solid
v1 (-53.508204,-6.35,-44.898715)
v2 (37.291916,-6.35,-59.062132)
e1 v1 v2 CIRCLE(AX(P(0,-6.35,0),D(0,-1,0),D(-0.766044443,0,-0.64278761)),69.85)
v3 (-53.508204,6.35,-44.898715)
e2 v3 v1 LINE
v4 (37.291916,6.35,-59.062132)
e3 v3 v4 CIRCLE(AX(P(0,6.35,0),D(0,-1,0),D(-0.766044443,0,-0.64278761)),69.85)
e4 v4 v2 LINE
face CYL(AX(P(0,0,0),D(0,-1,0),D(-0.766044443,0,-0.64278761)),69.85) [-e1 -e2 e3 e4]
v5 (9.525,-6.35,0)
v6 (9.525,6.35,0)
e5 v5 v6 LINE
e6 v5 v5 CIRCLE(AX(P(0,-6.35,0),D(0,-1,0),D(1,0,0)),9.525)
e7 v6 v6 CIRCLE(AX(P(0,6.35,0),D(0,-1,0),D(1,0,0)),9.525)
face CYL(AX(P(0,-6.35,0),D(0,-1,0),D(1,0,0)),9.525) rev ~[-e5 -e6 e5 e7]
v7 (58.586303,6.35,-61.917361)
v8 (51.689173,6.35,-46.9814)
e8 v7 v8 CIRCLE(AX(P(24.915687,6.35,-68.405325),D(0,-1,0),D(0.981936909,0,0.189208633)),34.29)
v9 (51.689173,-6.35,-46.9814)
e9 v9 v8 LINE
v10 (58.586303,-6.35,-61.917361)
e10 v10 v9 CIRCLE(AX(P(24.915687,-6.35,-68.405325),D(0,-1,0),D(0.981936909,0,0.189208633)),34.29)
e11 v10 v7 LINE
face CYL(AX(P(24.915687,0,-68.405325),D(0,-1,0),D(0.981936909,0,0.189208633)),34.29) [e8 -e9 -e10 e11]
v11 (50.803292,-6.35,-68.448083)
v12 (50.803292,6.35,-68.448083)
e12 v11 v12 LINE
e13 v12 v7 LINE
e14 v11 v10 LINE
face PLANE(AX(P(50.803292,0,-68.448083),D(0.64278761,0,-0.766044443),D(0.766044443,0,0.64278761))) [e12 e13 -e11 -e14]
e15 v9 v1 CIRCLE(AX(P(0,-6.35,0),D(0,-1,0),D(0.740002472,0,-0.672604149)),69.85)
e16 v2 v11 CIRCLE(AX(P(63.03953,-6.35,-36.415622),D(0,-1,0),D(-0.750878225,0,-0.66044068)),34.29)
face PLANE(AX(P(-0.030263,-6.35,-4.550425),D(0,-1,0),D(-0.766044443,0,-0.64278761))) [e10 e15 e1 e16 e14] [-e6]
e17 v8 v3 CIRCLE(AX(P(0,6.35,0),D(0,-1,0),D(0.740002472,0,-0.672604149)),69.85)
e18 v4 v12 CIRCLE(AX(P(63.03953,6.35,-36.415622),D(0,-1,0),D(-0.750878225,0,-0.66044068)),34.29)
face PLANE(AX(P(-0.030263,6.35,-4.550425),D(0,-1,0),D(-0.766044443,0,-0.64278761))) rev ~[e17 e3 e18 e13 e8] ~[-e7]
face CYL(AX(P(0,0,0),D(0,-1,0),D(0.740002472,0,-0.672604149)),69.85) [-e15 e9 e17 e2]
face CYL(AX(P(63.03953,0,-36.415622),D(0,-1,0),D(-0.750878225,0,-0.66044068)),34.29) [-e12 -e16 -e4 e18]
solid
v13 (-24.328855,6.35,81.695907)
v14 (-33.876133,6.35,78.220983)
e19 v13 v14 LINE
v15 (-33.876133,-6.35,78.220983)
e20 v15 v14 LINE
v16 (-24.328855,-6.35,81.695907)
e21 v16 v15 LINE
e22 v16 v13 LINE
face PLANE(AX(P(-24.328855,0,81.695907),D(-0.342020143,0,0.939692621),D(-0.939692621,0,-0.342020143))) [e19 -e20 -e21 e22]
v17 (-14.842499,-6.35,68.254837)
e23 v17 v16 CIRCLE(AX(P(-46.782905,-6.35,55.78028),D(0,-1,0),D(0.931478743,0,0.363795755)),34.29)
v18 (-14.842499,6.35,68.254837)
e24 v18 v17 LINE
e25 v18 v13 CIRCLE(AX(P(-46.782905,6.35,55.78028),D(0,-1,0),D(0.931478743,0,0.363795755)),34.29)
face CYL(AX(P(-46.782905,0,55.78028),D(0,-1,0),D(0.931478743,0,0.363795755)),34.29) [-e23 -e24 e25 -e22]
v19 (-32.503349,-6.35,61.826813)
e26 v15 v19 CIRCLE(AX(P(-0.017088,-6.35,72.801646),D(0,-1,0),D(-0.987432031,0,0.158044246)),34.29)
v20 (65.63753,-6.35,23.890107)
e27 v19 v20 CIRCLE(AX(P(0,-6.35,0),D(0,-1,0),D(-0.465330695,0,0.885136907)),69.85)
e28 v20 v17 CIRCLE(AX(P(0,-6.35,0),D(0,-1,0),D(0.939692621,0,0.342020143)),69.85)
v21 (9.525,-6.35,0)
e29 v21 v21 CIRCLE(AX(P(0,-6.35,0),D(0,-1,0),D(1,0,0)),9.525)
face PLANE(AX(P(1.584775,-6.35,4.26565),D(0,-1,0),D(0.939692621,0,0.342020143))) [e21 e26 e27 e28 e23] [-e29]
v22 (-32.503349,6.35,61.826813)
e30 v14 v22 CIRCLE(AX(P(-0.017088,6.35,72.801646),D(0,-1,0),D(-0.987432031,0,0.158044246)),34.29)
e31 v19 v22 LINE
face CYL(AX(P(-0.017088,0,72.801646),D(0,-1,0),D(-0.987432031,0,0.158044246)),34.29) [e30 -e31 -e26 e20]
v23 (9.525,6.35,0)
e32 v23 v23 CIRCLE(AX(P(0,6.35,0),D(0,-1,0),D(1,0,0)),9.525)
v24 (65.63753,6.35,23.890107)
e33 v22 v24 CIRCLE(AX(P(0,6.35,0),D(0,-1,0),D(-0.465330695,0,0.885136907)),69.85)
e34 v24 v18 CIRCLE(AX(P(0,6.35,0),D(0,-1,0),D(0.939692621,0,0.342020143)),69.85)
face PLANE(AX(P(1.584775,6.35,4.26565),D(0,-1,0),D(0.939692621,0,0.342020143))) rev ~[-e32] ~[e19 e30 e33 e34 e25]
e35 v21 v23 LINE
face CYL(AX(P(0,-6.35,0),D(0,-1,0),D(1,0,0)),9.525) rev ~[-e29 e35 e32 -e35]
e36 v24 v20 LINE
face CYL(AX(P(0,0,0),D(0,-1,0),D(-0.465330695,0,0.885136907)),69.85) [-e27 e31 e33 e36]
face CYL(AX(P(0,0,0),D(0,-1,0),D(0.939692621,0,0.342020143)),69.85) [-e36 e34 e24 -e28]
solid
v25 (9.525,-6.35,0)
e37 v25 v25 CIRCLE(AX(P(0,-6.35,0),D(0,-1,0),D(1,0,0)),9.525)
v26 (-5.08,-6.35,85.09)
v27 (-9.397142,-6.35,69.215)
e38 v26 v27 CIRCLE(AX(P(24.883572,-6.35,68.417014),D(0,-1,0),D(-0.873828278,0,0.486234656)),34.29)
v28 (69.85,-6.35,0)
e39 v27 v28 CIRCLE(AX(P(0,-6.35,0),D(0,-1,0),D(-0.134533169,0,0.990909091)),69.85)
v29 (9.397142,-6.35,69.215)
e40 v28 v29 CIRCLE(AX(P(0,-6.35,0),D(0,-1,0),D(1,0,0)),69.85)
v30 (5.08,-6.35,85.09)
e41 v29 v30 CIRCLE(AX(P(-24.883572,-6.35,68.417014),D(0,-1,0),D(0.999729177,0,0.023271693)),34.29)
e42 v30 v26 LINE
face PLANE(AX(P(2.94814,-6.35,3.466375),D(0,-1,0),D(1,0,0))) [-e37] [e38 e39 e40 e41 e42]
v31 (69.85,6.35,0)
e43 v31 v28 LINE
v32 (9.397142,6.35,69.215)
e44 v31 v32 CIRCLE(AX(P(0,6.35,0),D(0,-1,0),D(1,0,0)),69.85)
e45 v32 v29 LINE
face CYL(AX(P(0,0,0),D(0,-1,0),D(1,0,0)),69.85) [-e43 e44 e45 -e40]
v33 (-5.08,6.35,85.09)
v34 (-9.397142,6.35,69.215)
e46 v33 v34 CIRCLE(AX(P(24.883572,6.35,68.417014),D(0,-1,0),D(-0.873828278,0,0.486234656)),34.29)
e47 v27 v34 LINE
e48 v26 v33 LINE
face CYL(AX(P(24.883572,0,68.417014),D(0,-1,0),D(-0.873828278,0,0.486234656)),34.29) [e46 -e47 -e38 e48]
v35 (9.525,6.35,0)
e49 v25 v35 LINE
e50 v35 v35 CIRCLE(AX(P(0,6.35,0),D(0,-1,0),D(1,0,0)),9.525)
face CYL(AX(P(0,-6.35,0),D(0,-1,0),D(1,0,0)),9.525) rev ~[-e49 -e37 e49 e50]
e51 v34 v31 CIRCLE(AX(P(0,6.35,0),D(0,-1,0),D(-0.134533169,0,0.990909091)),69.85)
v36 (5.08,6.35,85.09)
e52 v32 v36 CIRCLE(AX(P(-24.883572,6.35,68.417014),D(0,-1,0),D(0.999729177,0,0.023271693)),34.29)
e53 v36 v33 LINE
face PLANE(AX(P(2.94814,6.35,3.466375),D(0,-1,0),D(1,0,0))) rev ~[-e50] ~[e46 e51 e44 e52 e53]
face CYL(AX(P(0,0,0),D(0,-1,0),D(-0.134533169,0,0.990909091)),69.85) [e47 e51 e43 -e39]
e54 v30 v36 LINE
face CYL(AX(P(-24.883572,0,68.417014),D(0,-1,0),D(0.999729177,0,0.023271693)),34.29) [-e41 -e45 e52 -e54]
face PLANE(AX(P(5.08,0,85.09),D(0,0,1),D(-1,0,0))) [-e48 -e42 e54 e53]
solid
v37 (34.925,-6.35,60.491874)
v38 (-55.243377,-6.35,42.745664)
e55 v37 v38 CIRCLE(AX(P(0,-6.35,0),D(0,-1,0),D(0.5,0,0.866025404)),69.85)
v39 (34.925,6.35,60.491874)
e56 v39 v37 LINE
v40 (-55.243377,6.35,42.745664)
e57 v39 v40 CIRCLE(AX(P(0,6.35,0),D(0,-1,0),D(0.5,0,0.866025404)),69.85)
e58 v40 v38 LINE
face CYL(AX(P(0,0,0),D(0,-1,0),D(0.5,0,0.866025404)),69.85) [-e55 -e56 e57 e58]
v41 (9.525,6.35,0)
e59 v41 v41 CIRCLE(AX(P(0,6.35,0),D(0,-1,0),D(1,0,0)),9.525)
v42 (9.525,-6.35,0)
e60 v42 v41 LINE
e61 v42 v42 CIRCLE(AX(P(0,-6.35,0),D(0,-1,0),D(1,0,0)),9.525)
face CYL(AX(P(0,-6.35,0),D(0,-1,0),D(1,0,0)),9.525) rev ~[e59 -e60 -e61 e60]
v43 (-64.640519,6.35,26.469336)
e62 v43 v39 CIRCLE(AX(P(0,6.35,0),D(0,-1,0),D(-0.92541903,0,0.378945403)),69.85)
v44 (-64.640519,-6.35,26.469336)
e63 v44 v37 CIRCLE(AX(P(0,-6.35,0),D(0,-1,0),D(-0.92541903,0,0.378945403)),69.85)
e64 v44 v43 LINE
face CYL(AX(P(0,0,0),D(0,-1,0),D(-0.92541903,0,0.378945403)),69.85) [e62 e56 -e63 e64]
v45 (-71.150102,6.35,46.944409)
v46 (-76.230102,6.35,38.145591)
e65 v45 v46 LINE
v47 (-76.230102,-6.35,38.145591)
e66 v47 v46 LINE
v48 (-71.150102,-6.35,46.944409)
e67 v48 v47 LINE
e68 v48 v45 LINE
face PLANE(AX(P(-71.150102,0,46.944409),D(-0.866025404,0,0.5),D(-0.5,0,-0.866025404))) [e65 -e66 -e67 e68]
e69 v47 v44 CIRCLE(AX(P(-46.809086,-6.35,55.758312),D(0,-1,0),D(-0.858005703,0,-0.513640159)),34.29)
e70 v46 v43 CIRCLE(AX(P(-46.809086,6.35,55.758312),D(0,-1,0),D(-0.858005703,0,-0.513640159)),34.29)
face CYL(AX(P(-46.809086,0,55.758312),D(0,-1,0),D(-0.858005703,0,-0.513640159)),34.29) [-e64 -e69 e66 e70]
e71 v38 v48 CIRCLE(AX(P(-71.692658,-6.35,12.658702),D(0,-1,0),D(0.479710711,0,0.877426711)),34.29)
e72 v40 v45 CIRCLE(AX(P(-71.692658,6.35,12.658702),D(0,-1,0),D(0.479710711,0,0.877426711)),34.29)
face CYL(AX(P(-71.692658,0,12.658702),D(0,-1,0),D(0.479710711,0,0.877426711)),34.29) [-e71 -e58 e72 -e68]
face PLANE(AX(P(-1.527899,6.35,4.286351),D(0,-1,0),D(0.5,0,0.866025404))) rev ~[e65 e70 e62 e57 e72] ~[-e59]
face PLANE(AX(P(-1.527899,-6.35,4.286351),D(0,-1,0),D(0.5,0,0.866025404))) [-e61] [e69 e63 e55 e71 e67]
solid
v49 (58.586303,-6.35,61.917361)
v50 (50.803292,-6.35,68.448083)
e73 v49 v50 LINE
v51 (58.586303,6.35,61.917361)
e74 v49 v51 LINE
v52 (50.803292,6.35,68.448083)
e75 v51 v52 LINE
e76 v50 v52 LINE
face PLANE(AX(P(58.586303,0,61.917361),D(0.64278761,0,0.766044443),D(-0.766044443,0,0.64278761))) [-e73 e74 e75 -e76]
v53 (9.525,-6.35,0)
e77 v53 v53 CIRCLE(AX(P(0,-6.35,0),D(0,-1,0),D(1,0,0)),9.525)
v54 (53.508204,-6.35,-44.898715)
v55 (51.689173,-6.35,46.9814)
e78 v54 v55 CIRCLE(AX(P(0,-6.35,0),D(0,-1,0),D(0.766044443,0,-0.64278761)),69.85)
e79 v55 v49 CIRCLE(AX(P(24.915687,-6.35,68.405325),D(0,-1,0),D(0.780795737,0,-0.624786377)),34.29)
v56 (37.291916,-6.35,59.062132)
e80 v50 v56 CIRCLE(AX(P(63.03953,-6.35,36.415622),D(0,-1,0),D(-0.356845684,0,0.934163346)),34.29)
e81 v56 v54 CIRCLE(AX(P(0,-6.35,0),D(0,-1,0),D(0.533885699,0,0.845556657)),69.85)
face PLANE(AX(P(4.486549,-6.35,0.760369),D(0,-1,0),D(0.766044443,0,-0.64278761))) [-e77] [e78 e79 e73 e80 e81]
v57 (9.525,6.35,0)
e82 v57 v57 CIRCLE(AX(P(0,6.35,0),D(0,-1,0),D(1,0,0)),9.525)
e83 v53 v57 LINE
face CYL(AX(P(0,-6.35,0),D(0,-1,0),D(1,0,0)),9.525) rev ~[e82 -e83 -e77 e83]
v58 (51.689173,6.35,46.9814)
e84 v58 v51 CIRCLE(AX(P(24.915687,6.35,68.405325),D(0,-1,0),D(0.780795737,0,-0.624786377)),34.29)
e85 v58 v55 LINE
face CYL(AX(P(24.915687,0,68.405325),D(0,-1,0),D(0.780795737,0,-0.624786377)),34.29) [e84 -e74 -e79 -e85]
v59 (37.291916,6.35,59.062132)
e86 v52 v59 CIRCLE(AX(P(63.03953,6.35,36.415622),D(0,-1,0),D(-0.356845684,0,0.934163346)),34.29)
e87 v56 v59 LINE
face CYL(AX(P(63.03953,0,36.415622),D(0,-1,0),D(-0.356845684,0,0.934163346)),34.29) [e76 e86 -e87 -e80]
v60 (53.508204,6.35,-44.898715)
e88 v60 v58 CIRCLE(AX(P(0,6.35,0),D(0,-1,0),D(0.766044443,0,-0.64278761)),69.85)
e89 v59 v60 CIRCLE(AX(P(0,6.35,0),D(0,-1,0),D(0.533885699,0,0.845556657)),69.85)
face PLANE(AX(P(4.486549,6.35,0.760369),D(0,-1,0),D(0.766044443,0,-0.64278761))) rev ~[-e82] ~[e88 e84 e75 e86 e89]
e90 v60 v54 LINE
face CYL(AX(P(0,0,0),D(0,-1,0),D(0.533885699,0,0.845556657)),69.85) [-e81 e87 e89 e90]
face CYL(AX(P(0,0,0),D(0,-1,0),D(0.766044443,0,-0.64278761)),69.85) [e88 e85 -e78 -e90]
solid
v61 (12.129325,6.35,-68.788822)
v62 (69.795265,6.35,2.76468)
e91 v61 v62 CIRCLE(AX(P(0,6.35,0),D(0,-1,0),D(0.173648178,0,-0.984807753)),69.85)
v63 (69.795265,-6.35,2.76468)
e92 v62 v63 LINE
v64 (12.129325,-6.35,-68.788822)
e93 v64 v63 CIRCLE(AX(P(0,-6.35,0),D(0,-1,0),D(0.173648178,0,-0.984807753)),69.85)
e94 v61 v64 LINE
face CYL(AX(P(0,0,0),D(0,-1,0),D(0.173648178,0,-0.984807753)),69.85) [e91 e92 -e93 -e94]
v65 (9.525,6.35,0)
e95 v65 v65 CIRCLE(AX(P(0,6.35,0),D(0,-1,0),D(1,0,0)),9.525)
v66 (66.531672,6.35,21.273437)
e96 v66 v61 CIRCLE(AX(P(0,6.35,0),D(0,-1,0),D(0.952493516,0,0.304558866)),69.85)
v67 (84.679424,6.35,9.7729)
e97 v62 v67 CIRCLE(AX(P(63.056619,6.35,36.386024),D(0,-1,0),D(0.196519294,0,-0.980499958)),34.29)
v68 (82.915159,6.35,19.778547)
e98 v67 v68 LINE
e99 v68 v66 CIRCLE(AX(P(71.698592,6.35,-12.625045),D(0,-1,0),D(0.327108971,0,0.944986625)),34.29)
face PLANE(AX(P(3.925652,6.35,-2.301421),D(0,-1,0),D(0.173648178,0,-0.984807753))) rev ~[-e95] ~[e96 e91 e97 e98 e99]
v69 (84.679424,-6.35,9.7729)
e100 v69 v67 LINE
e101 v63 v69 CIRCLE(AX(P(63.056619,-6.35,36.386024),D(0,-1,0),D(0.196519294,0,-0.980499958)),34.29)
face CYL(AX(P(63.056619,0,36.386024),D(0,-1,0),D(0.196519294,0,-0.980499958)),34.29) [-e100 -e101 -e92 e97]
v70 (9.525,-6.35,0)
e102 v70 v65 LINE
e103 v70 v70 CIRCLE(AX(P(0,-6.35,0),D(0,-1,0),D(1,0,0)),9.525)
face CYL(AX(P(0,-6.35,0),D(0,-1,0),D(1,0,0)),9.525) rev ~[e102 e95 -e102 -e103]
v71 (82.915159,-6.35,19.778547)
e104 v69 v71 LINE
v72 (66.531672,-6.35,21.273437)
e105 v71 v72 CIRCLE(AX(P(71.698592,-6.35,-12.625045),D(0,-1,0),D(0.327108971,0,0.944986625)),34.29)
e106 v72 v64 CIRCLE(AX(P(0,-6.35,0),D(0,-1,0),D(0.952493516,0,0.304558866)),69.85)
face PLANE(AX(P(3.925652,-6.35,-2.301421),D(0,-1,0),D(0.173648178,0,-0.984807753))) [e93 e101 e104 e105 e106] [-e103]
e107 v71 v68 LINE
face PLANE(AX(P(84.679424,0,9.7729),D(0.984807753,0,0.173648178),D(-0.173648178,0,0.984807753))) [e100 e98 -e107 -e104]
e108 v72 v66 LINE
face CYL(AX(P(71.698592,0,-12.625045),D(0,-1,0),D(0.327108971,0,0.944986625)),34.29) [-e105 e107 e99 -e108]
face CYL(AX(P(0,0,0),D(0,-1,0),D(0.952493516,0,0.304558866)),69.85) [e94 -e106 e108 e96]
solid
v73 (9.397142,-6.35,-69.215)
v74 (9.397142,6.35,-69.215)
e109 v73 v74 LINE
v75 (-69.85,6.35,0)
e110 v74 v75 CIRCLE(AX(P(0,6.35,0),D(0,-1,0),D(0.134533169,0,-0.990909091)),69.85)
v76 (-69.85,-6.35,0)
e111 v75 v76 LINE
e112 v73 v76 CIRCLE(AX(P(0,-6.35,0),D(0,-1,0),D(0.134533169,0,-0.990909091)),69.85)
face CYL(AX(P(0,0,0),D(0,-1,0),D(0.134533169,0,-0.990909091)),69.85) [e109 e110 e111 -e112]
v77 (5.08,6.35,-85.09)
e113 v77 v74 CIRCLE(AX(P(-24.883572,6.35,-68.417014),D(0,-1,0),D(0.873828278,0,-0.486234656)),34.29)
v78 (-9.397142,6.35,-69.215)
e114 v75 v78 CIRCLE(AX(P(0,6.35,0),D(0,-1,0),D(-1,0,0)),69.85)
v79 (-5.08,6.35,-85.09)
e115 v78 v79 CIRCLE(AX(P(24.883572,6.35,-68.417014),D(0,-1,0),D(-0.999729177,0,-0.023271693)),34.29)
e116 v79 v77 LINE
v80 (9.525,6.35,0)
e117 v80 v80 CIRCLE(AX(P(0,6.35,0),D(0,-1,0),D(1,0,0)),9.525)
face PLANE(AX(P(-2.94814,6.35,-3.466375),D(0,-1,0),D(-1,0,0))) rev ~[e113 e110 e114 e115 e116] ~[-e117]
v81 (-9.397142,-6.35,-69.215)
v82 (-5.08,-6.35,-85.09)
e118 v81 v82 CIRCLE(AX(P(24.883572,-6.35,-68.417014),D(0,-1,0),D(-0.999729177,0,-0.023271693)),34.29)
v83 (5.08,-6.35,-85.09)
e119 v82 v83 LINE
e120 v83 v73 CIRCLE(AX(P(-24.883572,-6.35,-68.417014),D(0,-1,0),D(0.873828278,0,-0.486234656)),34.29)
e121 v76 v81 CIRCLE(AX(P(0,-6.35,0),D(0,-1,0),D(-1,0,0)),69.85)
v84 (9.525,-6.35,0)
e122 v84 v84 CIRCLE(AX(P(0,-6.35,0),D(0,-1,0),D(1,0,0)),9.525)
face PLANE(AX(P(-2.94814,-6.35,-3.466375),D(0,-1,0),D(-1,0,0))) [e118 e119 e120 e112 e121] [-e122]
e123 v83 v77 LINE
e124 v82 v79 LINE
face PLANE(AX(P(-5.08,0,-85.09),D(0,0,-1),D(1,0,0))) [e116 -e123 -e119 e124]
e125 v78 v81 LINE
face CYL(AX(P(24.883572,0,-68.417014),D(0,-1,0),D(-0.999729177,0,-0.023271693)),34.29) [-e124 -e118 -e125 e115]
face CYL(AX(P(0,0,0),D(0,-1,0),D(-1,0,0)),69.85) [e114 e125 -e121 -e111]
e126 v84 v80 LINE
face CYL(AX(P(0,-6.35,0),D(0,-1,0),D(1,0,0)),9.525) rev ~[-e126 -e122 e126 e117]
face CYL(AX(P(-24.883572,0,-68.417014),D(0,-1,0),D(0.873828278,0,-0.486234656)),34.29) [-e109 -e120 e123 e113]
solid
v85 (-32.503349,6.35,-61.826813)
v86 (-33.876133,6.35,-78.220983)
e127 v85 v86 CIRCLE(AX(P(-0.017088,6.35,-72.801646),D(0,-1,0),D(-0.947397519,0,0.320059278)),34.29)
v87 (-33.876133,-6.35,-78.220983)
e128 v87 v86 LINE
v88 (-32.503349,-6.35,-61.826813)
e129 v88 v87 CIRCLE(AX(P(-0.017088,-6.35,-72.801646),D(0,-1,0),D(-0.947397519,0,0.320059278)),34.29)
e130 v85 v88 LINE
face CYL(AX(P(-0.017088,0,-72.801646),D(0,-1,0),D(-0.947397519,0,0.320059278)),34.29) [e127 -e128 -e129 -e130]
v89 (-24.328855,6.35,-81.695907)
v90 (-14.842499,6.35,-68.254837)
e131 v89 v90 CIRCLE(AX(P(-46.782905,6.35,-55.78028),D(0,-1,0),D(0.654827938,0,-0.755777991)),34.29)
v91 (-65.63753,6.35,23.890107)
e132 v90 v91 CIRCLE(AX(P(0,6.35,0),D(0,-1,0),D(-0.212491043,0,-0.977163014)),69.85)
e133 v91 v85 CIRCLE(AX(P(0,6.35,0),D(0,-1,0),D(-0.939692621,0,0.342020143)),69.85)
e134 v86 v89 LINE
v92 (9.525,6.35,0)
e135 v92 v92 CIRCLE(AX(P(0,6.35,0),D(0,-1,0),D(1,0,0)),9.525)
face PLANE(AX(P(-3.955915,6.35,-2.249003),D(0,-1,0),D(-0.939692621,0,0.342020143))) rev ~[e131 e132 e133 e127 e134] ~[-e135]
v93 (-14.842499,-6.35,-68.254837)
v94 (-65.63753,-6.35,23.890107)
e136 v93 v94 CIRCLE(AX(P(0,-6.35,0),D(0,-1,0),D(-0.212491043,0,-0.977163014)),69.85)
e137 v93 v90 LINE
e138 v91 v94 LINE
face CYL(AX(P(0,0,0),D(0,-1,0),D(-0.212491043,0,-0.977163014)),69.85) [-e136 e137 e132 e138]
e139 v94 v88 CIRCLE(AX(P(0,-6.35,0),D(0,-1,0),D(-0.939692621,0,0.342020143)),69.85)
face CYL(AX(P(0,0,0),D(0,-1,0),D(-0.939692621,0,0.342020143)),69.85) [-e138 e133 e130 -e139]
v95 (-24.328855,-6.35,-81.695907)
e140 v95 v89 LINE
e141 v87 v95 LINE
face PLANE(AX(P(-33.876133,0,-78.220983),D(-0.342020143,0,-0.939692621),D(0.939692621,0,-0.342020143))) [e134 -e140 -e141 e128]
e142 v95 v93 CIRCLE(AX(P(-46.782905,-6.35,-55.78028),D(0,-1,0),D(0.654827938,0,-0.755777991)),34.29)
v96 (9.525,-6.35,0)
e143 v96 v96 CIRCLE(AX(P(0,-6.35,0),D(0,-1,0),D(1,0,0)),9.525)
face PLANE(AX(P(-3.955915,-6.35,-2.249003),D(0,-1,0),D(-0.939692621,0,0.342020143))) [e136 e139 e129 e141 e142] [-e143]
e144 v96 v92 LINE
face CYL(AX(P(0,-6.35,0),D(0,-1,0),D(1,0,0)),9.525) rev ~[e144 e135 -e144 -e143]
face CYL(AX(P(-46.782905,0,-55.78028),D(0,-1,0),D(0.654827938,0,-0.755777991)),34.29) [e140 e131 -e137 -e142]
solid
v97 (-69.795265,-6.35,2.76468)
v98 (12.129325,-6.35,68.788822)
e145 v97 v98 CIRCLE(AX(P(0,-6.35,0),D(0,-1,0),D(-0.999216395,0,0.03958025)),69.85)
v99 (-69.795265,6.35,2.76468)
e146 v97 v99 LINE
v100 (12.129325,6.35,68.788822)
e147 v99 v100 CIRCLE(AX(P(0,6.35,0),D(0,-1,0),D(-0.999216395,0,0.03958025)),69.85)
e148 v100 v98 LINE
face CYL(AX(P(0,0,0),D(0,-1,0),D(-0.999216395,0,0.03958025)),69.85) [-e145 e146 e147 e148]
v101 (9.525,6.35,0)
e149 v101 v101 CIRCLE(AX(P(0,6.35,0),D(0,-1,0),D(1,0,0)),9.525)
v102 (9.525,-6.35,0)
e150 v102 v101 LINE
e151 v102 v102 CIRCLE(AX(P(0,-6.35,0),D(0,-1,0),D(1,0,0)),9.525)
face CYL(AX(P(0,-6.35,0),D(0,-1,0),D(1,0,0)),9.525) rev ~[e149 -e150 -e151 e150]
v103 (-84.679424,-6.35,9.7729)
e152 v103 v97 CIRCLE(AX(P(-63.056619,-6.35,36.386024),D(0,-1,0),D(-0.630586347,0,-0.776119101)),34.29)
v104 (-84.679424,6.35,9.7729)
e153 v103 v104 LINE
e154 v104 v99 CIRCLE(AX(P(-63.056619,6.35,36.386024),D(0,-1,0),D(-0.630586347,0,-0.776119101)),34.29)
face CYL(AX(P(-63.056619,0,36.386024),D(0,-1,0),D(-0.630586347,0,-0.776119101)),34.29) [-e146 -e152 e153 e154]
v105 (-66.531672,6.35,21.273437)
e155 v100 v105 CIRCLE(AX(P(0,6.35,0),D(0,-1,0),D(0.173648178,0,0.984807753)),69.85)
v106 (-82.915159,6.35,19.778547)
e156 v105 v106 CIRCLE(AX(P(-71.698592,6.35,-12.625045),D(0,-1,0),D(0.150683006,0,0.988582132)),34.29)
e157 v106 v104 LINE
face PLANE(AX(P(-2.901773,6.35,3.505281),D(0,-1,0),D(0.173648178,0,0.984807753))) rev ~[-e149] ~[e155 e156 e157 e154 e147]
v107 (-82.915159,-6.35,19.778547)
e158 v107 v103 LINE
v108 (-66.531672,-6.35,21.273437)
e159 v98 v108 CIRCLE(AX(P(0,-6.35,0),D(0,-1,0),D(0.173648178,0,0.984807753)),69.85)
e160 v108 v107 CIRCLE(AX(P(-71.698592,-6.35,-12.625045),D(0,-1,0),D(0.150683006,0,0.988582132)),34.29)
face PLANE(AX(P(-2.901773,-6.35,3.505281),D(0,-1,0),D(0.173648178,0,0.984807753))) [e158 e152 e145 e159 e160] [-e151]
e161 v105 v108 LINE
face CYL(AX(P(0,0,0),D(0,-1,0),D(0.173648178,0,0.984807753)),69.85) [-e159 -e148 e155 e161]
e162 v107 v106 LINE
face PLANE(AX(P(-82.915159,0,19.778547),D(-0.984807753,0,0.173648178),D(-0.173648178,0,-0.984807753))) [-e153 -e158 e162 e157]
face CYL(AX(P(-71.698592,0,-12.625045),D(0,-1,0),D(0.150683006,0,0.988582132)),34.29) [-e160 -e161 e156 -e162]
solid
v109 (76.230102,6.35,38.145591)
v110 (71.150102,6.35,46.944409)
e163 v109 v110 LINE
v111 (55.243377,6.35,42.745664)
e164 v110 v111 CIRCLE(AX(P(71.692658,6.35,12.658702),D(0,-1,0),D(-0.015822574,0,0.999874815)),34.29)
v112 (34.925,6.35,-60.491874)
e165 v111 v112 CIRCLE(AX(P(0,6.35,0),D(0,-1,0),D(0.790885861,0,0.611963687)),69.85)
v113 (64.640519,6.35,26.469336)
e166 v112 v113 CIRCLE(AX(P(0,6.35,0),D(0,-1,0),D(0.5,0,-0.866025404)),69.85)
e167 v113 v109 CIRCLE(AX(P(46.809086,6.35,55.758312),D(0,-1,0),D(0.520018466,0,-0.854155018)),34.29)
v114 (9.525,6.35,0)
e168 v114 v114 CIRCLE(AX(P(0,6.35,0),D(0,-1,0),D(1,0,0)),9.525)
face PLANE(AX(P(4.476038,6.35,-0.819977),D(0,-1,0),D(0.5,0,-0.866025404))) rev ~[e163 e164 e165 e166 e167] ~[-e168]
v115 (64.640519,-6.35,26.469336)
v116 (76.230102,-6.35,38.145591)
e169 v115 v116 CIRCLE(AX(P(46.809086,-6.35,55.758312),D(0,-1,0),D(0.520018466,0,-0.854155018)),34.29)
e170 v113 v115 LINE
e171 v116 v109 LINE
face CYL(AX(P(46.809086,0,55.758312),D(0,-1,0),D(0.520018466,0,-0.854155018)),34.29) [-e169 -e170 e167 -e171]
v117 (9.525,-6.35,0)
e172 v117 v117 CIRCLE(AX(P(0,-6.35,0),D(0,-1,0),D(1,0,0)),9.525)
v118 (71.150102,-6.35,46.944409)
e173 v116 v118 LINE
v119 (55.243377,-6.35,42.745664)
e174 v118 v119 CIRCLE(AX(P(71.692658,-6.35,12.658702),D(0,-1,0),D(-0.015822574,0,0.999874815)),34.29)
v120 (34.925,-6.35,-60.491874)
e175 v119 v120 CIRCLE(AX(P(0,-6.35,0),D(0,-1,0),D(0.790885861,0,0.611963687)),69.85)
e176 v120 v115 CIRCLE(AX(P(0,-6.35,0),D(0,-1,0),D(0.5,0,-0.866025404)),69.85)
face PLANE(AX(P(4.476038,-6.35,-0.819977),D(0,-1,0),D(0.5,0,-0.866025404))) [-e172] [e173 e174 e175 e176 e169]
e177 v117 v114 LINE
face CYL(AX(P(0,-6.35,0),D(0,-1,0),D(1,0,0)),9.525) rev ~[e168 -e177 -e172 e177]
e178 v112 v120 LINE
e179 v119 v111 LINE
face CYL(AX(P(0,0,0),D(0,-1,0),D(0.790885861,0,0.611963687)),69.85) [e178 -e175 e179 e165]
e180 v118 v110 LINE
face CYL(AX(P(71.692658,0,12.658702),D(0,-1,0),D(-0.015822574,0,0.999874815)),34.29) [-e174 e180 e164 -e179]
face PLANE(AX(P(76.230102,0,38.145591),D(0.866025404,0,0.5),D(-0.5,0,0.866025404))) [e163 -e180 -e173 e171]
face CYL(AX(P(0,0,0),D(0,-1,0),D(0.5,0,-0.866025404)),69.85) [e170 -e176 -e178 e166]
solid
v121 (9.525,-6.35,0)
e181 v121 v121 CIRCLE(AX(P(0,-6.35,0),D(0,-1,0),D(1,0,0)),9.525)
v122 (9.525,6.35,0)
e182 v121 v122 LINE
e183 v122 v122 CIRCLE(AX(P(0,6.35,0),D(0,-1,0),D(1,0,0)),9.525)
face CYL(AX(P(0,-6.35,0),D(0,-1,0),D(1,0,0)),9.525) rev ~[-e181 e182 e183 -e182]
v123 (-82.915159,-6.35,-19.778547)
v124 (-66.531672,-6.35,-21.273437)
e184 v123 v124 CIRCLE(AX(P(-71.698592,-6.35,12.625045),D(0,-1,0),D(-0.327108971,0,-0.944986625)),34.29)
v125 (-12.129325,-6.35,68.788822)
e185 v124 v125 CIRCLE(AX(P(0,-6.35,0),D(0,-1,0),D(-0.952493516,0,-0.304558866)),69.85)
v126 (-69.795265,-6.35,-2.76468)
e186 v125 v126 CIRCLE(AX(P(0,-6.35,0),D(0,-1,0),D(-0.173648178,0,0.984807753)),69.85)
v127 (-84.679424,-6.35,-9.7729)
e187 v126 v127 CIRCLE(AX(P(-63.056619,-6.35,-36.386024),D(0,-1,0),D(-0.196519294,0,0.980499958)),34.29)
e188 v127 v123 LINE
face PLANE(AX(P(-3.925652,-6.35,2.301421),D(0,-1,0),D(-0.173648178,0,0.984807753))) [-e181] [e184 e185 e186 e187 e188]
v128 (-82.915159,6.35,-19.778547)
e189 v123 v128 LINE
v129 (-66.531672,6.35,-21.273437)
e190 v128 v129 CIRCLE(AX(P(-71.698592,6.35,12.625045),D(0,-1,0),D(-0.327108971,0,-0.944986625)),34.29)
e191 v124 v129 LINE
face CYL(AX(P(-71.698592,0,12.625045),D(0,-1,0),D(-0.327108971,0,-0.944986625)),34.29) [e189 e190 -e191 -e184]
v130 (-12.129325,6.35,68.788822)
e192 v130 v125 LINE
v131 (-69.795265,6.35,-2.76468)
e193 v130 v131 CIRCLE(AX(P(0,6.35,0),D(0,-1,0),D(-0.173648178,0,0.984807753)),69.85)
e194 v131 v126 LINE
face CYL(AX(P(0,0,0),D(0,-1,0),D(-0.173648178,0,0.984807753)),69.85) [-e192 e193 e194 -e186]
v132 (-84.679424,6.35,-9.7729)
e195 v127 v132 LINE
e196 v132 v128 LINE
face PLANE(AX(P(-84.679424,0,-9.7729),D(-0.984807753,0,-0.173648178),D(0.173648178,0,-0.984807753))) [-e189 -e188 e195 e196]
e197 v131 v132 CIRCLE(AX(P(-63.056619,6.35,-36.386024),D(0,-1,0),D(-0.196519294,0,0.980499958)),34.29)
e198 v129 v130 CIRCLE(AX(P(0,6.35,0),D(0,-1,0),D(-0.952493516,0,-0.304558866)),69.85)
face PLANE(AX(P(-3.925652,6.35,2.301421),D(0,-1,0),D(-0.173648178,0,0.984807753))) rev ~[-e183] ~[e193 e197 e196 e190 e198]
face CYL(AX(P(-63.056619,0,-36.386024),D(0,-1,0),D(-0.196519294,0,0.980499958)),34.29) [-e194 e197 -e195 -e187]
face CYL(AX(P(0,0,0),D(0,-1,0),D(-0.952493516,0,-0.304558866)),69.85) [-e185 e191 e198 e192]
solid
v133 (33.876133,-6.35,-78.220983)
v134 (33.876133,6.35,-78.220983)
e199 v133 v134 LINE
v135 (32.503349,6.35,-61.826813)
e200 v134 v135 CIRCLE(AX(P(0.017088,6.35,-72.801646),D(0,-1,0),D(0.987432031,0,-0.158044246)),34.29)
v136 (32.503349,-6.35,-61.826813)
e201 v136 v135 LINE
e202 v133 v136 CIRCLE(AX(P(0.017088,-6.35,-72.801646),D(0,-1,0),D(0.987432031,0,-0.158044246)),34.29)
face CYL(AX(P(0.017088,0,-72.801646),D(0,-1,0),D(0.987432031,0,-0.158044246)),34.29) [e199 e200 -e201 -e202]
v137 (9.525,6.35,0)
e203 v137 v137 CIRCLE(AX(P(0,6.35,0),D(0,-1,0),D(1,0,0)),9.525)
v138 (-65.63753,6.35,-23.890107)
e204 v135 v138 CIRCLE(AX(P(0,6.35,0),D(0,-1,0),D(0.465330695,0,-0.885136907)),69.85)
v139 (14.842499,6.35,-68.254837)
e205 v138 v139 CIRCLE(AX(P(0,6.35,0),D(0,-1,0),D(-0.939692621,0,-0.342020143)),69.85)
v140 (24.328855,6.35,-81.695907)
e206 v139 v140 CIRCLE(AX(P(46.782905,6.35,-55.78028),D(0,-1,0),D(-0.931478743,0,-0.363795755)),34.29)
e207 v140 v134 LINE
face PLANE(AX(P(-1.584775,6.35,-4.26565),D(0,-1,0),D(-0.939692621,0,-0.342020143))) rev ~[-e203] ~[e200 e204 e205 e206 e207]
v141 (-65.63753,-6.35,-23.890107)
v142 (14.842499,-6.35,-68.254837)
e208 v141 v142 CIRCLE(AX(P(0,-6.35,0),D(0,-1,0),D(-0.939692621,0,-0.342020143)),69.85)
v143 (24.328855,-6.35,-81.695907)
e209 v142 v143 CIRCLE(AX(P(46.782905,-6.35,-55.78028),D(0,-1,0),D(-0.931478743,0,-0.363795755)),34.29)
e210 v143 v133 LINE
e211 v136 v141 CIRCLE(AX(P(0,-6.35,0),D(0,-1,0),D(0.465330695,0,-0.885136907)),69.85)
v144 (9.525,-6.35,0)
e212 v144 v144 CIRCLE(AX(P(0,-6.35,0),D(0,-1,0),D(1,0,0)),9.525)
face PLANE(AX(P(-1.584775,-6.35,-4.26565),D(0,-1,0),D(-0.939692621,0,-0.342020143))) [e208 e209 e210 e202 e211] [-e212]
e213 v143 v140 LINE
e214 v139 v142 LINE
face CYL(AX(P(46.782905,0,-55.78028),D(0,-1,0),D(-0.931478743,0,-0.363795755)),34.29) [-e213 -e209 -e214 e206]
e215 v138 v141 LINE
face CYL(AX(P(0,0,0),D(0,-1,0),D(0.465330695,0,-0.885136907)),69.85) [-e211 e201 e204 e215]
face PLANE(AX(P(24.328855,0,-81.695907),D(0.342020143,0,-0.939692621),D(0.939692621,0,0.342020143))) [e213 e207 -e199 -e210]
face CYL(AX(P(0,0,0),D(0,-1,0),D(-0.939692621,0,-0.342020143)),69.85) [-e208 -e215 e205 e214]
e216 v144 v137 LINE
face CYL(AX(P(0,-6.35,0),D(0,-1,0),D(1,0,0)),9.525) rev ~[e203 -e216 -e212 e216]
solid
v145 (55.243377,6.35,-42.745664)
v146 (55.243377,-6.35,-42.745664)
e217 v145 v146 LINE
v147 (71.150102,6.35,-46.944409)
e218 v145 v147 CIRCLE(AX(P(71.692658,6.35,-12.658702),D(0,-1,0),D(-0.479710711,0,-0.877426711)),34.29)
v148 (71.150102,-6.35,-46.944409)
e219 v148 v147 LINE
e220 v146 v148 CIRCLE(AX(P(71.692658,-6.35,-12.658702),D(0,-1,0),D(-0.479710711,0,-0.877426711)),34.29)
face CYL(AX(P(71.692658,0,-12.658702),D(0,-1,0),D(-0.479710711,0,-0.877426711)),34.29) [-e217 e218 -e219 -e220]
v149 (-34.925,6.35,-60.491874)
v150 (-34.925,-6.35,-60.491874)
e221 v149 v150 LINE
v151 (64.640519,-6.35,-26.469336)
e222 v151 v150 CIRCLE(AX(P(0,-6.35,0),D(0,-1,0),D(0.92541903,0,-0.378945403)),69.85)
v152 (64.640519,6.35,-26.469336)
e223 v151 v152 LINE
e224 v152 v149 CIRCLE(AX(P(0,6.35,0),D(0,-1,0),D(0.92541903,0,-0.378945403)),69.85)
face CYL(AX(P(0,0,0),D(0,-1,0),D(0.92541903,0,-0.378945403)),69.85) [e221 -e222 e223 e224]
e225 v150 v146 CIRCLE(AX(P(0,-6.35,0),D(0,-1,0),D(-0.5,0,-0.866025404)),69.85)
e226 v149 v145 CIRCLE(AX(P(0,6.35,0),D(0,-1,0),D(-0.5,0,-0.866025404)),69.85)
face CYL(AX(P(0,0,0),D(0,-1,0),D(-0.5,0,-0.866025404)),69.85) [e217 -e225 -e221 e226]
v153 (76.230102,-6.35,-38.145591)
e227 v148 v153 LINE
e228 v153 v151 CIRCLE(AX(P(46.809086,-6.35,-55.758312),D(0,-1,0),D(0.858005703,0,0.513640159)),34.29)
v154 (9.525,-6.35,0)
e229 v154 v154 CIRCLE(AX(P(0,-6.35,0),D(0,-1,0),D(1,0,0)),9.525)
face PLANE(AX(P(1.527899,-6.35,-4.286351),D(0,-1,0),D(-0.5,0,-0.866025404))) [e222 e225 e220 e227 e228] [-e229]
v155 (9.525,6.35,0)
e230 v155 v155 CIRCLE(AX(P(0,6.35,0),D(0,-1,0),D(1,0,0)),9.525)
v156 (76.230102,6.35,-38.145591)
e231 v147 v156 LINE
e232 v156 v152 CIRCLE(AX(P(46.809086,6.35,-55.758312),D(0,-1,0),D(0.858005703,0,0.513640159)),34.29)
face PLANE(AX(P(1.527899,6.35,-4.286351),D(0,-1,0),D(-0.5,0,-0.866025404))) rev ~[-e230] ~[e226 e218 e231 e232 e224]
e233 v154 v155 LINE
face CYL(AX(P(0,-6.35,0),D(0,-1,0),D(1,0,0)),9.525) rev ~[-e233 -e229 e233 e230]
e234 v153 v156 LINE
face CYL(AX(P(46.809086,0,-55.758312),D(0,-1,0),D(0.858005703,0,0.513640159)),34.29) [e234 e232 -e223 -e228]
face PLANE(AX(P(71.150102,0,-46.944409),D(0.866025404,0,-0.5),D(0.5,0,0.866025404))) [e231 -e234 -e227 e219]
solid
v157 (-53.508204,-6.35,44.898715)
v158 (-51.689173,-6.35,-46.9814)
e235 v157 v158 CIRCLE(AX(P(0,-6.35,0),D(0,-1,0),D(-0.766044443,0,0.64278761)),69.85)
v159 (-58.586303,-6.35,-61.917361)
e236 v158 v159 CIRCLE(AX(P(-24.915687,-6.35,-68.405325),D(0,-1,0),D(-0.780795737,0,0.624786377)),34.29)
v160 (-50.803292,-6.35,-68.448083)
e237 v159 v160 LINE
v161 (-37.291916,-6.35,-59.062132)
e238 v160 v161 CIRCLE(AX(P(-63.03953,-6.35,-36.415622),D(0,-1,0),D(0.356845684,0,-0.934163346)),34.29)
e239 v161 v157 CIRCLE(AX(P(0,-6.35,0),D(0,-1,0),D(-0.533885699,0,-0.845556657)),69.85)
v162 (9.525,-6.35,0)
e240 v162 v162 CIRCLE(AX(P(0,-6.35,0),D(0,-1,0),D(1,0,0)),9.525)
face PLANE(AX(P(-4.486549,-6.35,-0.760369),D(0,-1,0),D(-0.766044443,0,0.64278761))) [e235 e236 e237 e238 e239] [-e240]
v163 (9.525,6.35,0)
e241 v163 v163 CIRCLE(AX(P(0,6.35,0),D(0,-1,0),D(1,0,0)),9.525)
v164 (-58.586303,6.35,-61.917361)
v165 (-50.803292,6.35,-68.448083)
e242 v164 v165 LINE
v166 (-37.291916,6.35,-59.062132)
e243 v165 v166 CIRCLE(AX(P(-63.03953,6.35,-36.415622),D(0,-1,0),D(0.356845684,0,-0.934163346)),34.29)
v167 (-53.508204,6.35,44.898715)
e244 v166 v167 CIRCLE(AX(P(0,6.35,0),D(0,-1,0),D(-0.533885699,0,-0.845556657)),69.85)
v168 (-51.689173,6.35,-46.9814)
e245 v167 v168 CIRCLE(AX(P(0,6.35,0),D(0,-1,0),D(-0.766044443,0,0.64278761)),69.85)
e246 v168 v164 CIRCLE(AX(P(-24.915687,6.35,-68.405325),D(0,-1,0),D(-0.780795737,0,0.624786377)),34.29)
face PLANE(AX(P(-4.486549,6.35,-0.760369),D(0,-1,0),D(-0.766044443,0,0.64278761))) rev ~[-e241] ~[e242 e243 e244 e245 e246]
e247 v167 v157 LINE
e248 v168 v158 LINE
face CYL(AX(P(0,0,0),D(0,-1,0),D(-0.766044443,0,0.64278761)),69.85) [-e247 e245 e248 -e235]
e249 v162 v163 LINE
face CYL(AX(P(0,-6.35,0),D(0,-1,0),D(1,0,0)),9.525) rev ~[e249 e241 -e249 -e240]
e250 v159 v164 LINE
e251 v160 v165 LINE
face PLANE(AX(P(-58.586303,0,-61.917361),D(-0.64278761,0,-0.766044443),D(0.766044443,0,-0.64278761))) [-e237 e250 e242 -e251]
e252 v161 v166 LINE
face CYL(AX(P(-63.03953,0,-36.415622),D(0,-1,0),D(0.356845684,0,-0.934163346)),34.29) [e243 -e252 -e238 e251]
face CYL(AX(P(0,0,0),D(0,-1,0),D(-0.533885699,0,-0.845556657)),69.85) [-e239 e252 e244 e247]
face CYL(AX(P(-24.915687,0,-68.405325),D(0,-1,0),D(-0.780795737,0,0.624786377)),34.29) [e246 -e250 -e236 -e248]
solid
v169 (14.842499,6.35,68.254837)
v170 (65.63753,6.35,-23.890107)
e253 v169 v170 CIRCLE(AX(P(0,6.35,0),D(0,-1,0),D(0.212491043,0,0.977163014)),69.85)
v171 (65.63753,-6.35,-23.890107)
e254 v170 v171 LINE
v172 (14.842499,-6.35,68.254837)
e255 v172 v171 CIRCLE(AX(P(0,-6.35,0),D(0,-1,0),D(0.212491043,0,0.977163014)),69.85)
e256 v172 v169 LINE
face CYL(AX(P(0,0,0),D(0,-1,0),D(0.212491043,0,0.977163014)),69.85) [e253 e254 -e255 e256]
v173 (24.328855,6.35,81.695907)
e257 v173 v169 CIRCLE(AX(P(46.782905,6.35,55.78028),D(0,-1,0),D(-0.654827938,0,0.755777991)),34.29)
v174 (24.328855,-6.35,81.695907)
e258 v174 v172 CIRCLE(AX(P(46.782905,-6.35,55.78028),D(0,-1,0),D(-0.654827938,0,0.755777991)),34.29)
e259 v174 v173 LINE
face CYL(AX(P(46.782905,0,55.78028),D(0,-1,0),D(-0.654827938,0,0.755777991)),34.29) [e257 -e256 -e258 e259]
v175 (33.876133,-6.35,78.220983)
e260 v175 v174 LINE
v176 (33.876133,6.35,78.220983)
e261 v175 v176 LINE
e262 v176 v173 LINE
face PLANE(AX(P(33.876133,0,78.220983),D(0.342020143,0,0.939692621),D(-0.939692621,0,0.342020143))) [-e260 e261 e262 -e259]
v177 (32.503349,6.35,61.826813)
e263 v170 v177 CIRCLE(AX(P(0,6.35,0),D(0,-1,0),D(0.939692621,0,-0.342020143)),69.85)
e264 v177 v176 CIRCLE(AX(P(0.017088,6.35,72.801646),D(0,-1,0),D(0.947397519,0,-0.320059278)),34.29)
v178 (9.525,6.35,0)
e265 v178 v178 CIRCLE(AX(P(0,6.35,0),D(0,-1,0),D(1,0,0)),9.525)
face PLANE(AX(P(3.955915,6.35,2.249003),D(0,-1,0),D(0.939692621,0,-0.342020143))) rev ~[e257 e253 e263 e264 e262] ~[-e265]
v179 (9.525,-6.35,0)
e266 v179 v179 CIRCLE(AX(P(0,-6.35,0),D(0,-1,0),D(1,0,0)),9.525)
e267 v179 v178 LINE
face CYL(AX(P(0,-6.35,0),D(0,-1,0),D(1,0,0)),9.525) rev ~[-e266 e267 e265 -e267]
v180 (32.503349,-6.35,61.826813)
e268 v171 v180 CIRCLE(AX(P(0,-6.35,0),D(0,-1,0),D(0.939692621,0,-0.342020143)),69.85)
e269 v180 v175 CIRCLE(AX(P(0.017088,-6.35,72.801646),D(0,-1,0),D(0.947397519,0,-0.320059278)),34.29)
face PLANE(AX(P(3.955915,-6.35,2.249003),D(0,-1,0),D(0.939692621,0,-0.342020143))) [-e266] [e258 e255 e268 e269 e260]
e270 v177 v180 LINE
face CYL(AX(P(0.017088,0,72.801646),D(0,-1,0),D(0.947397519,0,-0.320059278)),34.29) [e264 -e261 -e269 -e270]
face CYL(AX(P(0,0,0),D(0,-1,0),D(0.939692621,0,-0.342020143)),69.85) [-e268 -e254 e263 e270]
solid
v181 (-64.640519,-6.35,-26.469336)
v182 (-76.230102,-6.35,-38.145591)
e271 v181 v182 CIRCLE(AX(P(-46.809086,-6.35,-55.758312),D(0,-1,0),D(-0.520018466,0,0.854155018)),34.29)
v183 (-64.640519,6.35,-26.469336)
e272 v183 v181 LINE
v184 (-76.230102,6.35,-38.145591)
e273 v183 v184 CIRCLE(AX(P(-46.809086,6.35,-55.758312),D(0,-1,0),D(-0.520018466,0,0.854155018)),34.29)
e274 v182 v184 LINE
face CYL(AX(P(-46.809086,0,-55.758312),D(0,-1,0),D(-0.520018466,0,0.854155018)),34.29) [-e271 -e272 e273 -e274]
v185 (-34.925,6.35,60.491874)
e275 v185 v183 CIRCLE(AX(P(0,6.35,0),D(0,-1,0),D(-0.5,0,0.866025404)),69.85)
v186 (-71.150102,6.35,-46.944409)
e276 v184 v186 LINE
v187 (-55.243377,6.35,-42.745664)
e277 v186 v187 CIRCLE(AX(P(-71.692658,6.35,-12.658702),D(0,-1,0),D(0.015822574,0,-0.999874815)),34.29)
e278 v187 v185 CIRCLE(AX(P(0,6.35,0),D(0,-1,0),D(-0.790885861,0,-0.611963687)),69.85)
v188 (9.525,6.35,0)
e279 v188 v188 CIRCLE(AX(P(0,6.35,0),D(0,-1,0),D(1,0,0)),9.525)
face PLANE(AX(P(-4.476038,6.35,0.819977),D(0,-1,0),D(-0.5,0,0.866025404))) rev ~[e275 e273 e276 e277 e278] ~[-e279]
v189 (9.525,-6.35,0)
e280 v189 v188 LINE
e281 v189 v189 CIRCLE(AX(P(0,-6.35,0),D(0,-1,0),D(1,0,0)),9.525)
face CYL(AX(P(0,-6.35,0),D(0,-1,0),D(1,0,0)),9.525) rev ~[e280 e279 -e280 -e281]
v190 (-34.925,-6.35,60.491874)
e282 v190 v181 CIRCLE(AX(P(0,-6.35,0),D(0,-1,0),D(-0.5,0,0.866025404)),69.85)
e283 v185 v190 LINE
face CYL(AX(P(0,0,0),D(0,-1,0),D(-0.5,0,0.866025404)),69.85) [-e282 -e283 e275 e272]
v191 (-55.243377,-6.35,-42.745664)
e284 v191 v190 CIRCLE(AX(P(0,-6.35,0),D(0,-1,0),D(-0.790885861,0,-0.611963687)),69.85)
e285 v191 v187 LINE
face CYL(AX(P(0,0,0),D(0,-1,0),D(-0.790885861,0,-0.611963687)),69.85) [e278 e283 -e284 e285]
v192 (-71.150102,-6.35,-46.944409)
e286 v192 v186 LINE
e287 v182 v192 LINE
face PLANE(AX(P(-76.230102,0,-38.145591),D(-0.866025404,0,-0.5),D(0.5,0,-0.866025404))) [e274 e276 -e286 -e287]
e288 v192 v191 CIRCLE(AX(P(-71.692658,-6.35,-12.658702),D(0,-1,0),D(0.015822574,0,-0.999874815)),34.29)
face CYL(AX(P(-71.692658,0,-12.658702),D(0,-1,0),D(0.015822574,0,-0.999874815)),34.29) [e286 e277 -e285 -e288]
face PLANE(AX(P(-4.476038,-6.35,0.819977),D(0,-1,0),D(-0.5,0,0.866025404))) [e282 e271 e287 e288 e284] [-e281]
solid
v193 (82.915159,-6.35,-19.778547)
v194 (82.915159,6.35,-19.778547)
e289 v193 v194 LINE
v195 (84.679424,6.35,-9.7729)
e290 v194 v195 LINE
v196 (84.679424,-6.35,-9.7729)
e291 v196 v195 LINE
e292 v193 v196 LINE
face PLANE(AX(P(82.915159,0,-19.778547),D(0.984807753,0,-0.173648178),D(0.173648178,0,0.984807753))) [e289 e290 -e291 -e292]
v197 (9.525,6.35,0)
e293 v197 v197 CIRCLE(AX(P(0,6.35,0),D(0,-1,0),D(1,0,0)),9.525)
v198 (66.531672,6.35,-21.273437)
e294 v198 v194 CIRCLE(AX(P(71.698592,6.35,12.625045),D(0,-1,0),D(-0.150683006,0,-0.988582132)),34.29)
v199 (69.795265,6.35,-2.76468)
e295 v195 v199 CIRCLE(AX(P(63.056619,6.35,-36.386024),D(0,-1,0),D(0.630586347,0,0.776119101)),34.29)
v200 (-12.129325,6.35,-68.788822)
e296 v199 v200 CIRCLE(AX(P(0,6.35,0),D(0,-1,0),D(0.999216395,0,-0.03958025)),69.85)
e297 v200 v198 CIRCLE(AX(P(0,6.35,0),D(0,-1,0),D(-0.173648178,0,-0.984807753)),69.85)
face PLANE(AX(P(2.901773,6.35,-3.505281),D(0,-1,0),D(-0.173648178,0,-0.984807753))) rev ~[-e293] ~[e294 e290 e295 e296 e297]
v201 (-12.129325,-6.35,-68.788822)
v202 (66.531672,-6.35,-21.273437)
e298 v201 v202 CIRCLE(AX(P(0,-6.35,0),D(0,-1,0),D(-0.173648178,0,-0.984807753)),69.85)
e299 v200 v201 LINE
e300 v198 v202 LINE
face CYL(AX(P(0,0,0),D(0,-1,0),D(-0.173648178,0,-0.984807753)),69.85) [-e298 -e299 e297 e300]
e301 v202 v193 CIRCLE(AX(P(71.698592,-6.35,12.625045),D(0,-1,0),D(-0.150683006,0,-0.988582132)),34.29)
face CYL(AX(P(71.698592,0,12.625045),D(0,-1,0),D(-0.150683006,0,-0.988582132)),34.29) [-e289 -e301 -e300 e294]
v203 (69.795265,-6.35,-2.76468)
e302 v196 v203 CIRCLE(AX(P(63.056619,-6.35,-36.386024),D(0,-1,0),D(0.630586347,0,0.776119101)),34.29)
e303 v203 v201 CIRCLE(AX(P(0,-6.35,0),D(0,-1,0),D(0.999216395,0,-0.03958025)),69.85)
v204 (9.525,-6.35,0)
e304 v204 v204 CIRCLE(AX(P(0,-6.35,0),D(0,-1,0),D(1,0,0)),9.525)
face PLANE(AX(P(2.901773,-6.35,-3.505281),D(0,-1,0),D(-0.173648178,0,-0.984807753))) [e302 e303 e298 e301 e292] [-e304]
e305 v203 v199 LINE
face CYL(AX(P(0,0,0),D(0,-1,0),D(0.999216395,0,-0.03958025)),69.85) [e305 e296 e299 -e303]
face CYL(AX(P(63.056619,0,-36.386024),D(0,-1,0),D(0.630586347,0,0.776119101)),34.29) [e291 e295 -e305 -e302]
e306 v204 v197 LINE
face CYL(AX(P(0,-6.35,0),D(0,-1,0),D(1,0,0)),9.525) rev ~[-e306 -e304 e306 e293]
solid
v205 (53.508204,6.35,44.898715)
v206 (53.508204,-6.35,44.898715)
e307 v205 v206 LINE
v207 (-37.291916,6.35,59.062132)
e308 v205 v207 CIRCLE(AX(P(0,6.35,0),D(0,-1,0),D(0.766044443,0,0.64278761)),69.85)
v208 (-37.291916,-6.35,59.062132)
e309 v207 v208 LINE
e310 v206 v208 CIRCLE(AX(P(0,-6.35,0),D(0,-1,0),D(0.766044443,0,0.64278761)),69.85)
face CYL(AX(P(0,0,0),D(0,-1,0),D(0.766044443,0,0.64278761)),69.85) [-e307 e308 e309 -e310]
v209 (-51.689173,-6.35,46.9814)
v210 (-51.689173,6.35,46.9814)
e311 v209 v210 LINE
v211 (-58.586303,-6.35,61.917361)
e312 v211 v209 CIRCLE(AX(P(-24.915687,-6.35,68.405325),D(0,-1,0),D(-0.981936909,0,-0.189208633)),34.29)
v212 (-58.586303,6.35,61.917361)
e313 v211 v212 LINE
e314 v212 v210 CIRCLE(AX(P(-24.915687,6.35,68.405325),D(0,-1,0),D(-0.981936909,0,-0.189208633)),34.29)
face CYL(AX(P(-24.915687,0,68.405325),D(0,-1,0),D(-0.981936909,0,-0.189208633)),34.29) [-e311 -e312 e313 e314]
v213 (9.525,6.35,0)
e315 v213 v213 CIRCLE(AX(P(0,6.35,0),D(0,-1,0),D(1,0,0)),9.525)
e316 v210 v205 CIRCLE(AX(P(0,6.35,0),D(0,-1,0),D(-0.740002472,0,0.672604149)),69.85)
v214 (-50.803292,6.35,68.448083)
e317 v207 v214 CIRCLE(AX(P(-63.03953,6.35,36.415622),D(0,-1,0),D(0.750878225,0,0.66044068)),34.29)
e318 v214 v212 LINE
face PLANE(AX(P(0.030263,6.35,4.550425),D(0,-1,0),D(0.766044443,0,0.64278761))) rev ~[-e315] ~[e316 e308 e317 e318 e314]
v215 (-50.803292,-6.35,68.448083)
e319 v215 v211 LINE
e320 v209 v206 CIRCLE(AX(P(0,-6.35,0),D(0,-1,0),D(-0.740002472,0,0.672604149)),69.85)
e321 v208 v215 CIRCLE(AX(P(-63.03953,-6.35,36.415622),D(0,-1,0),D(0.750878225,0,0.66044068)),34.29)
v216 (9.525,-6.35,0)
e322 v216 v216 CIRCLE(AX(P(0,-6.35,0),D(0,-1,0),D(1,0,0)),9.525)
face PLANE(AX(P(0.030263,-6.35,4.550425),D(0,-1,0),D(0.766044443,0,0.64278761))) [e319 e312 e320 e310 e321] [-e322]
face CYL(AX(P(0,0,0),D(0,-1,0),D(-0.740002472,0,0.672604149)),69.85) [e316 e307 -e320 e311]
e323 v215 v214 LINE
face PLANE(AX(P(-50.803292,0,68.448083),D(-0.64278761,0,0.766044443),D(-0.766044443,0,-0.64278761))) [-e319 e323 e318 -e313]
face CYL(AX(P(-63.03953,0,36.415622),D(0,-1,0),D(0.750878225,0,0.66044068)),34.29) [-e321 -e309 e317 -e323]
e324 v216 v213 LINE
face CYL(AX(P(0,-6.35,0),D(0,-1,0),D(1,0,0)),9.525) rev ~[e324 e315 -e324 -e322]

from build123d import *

# Parameters (mm, degrees)
F1_DEPTH = 6.35
F2_COUNT = 18
F3_R     = 9.525
F4_DEPTH = 12.701


# Not quite as in the source:
# - a feature names something its author has since deleted; it is built from what else it names


with BuildPart() as f1:
    # F0 (on Front) → F1 (new body, symmetric)
    with BuildSketch(Plane.XZ):
        with BuildLine():
            ThreePointArc((-9.3971418527, 69.215), (-45.9490595202, -52.6089957061), (69.85, 0))
            ThreePointArc((69.85, 0), (52.6089957061, 45.9490595202), (9.3971418527, 69.215))
            ThreePointArc((9.3971418527, 69.215), (4.7092860393, 69.6910691911), (0, 69.85))
            ThreePointArc((0, 69.85), (-4.7092860393, 69.6910691911), (-9.3971418527, 69.215))
        make_face()
        with BuildLine():
            ThreePointArc((0, 69.85), (4.7092860393, 69.6910691911), (9.3971418527, 69.215))
            ThreePointArc((9.3971418527, 69.215), (8.2047336853, 77.415244043), (5.08, 85.09))
            Line((5.08, 85.09), (-5.08, 85.09))
            ThreePointArc((-5.08, 85.09), (-8.2047336853, 77.415244043), (-9.3971418527, 69.215))
            ThreePointArc((-9.3971418527, 69.215), (-4.7092860393, 69.6910691911), (0, 69.85))
        make_face()
    extrude(amount=F1_DEPTH, both=True)


with BuildPart() as f2_1:
    # F2: instance of F1
    add(f1.part.rotate(Axis((0, 0, 0), (0, 1, 0)), 1 * 360 / F2_COUNT))


with BuildPart() as f2_2:
    # F2: instance of F1
    add(f1.part.rotate(Axis((0, 0, 0), (0, 1, 0)), 2 * 360 / F2_COUNT))


with BuildPart() as f2_3:
    # F2: instance of F1
    add(f1.part.rotate(Axis((0, 0, 0), (0, 1, 0)), 3 * 360 / F2_COUNT))


with BuildPart() as f2_4:
    # F2: instance of F1
    add(f1.part.rotate(Axis((0, 0, 0), (0, 1, 0)), 4 * 360 / F2_COUNT))


with BuildPart() as f2_5:
    # F2: instance of F1
    add(f1.part.rotate(Axis((0, 0, 0), (0, 1, 0)), 5 * 360 / F2_COUNT))


with BuildPart() as f2_6:
    # F2: instance of F1
    add(f1.part.rotate(Axis((0, 0, 0), (0, 1, 0)), 6 * 360 / F2_COUNT))


with BuildPart() as f2_7:
    # F2: instance of F1
    add(f1.part.rotate(Axis((0, 0, 0), (0, 1, 0)), 7 * 360 / F2_COUNT))


with BuildPart() as f2_8:
    # F2: instance of F1
    add(f1.part.rotate(Axis((0, 0, 0), (0, 1, 0)), 8 * 360 / F2_COUNT))


with BuildPart() as f2_9:
    # F2: instance of F1
    add(f1.part.rotate(Axis((0, 0, 0), (0, 1, 0)), 9 * 360 / F2_COUNT))


with BuildPart() as f2_10:
    # F2: instance of F1
    add(f1.part.rotate(Axis((0, 0, 0), (0, 1, 0)), 10 * 360 / F2_COUNT))


with BuildPart() as f2_11:
    # F2: instance of F1
    add(f1.part.rotate(Axis((0, 0, 0), (0, 1, 0)), 11 * 360 / F2_COUNT))


with BuildPart() as f2_12:
    # F2: instance of F1
    add(f1.part.rotate(Axis((0, 0, 0), (0, 1, 0)), 12 * 360 / F2_COUNT))


with BuildPart() as f2_13:
    # F2: instance of F1
    add(f1.part.rotate(Axis((0, 0, 0), (0, 1, 0)), 13 * 360 / F2_COUNT))


with BuildPart() as f2_14:
    # F2: instance of F1
    add(f1.part.rotate(Axis((0, 0, 0), (0, 1, 0)), 14 * 360 / F2_COUNT))


with BuildPart() as f2_15:
    # F2: instance of F1
    add(f1.part.rotate(Axis((0, 0, 0), (0, 1, 0)), 15 * 360 / F2_COUNT))


with BuildPart() as f2_16:
    # F2: instance of F1
    add(f1.part.rotate(Axis((0, 0, 0), (0, 1, 0)), 16 * 360 / F2_COUNT))


with BuildPart() as f2_17:
    # F2: instance of F1
    add(f1.part.rotate(Axis((0, 0, 0), (0, 1, 0)), 17 * 360 / F2_COUNT))


with BuildPart() as f4_tool:
    # F3 (on face) → F4 (new body, through all)
    with BuildSketch(Plane.XZ.offset(6.35)):
        Circle(F3_R)
    extrude(amount=-F4_DEPTH)


with BuildPart() as f1_1:
    add(f1.part)

    # F4: cut by f4_tool
    add(f4_tool.part, mode=Mode.SUBTRACT)


with BuildPart() as f2_1_1:
    add(f2_1.part)

    # F4: cut by f4_tool
    add(f4_tool.part, mode=Mode.SUBTRACT)


with BuildPart() as f2_2_1:
    add(f2_2.part)

    # F4: cut by f4_tool
    add(f4_tool.part, mode=Mode.SUBTRACT)


with BuildPart() as f2_3_1:
    add(f2_3.part)

    # F4: cut by f4_tool
    add(f4_tool.part, mode=Mode.SUBTRACT)


with BuildPart() as f2_4_1:
    add(f2_4.part)

    # F4: cut by f4_tool
    add(f4_tool.part, mode=Mode.SUBTRACT)


with BuildPart() as f2_5_1:
    add(f2_5.part)

    # F4: cut by f4_tool
    add(f4_tool.part, mode=Mode.SUBTRACT)


with BuildPart() as f2_6_1:
    add(f2_6.part)

    # F4: cut by f4_tool
    add(f4_tool.part, mode=Mode.SUBTRACT)


with BuildPart() as f2_7_1:
    add(f2_7.part)

    # F4: cut by f4_tool
    add(f4_tool.part, mode=Mode.SUBTRACT)


with BuildPart() as f2_8_1:
    add(f2_8.part)

    # F4: cut by f4_tool
    add(f4_tool.part, mode=Mode.SUBTRACT)


with BuildPart() as f2_9_1:
    add(f2_9.part)

    # F4: cut by f4_tool
    add(f4_tool.part, mode=Mode.SUBTRACT)


with BuildPart() as f2_10_1:
    add(f2_10.part)

    # F4: cut by f4_tool
    add(f4_tool.part, mode=Mode.SUBTRACT)


with BuildPart() as f2_11_1:
    add(f2_11.part)

    # F4: cut by f4_tool
    add(f4_tool.part, mode=Mode.SUBTRACT)


with BuildPart() as f2_12_1:
    add(f2_12.part)

    # F4: cut by f4_tool
    add(f4_tool.part, mode=Mode.SUBTRACT)


with BuildPart() as f2_13_1:
    add(f2_13.part)

    # F4: cut by f4_tool
    add(f4_tool.part, mode=Mode.SUBTRACT)


with BuildPart() as f2_14_1:
    add(f2_14.part)

    # F4: cut by f4_tool
    add(f4_tool.part, mode=Mode.SUBTRACT)


with BuildPart() as f2_15_1:
    add(f2_15.part)

    # F4: cut by f4_tool
    add(f4_tool.part, mode=Mode.SUBTRACT)


with BuildPart() as f2_16_1:
    add(f2_16.part)

    # F4: cut by f4_tool
    add(f4_tool.part, mode=Mode.SUBTRACT)


with BuildPart() as f2_17_1:
    add(f2_17.part)

    # F4: cut by f4_tool
    add(f4_tool.part, mode=Mode.SUBTRACT)


solid = Compound([f1_1.part, f2_1_1.part, f2_2_1.part, f2_3_1.part, f2_4_1.part, f2_5_1.part, f2_6_1.part, f2_7_1.part, f2_8_1.part, f2_9_1.part, f2_10_1.part, f2_11_1.part, f2_12_1.part, f2_13_1.part, f2_14_1.part, f2_15_1.part, f2_16_1.part, f2_17_1.part])
